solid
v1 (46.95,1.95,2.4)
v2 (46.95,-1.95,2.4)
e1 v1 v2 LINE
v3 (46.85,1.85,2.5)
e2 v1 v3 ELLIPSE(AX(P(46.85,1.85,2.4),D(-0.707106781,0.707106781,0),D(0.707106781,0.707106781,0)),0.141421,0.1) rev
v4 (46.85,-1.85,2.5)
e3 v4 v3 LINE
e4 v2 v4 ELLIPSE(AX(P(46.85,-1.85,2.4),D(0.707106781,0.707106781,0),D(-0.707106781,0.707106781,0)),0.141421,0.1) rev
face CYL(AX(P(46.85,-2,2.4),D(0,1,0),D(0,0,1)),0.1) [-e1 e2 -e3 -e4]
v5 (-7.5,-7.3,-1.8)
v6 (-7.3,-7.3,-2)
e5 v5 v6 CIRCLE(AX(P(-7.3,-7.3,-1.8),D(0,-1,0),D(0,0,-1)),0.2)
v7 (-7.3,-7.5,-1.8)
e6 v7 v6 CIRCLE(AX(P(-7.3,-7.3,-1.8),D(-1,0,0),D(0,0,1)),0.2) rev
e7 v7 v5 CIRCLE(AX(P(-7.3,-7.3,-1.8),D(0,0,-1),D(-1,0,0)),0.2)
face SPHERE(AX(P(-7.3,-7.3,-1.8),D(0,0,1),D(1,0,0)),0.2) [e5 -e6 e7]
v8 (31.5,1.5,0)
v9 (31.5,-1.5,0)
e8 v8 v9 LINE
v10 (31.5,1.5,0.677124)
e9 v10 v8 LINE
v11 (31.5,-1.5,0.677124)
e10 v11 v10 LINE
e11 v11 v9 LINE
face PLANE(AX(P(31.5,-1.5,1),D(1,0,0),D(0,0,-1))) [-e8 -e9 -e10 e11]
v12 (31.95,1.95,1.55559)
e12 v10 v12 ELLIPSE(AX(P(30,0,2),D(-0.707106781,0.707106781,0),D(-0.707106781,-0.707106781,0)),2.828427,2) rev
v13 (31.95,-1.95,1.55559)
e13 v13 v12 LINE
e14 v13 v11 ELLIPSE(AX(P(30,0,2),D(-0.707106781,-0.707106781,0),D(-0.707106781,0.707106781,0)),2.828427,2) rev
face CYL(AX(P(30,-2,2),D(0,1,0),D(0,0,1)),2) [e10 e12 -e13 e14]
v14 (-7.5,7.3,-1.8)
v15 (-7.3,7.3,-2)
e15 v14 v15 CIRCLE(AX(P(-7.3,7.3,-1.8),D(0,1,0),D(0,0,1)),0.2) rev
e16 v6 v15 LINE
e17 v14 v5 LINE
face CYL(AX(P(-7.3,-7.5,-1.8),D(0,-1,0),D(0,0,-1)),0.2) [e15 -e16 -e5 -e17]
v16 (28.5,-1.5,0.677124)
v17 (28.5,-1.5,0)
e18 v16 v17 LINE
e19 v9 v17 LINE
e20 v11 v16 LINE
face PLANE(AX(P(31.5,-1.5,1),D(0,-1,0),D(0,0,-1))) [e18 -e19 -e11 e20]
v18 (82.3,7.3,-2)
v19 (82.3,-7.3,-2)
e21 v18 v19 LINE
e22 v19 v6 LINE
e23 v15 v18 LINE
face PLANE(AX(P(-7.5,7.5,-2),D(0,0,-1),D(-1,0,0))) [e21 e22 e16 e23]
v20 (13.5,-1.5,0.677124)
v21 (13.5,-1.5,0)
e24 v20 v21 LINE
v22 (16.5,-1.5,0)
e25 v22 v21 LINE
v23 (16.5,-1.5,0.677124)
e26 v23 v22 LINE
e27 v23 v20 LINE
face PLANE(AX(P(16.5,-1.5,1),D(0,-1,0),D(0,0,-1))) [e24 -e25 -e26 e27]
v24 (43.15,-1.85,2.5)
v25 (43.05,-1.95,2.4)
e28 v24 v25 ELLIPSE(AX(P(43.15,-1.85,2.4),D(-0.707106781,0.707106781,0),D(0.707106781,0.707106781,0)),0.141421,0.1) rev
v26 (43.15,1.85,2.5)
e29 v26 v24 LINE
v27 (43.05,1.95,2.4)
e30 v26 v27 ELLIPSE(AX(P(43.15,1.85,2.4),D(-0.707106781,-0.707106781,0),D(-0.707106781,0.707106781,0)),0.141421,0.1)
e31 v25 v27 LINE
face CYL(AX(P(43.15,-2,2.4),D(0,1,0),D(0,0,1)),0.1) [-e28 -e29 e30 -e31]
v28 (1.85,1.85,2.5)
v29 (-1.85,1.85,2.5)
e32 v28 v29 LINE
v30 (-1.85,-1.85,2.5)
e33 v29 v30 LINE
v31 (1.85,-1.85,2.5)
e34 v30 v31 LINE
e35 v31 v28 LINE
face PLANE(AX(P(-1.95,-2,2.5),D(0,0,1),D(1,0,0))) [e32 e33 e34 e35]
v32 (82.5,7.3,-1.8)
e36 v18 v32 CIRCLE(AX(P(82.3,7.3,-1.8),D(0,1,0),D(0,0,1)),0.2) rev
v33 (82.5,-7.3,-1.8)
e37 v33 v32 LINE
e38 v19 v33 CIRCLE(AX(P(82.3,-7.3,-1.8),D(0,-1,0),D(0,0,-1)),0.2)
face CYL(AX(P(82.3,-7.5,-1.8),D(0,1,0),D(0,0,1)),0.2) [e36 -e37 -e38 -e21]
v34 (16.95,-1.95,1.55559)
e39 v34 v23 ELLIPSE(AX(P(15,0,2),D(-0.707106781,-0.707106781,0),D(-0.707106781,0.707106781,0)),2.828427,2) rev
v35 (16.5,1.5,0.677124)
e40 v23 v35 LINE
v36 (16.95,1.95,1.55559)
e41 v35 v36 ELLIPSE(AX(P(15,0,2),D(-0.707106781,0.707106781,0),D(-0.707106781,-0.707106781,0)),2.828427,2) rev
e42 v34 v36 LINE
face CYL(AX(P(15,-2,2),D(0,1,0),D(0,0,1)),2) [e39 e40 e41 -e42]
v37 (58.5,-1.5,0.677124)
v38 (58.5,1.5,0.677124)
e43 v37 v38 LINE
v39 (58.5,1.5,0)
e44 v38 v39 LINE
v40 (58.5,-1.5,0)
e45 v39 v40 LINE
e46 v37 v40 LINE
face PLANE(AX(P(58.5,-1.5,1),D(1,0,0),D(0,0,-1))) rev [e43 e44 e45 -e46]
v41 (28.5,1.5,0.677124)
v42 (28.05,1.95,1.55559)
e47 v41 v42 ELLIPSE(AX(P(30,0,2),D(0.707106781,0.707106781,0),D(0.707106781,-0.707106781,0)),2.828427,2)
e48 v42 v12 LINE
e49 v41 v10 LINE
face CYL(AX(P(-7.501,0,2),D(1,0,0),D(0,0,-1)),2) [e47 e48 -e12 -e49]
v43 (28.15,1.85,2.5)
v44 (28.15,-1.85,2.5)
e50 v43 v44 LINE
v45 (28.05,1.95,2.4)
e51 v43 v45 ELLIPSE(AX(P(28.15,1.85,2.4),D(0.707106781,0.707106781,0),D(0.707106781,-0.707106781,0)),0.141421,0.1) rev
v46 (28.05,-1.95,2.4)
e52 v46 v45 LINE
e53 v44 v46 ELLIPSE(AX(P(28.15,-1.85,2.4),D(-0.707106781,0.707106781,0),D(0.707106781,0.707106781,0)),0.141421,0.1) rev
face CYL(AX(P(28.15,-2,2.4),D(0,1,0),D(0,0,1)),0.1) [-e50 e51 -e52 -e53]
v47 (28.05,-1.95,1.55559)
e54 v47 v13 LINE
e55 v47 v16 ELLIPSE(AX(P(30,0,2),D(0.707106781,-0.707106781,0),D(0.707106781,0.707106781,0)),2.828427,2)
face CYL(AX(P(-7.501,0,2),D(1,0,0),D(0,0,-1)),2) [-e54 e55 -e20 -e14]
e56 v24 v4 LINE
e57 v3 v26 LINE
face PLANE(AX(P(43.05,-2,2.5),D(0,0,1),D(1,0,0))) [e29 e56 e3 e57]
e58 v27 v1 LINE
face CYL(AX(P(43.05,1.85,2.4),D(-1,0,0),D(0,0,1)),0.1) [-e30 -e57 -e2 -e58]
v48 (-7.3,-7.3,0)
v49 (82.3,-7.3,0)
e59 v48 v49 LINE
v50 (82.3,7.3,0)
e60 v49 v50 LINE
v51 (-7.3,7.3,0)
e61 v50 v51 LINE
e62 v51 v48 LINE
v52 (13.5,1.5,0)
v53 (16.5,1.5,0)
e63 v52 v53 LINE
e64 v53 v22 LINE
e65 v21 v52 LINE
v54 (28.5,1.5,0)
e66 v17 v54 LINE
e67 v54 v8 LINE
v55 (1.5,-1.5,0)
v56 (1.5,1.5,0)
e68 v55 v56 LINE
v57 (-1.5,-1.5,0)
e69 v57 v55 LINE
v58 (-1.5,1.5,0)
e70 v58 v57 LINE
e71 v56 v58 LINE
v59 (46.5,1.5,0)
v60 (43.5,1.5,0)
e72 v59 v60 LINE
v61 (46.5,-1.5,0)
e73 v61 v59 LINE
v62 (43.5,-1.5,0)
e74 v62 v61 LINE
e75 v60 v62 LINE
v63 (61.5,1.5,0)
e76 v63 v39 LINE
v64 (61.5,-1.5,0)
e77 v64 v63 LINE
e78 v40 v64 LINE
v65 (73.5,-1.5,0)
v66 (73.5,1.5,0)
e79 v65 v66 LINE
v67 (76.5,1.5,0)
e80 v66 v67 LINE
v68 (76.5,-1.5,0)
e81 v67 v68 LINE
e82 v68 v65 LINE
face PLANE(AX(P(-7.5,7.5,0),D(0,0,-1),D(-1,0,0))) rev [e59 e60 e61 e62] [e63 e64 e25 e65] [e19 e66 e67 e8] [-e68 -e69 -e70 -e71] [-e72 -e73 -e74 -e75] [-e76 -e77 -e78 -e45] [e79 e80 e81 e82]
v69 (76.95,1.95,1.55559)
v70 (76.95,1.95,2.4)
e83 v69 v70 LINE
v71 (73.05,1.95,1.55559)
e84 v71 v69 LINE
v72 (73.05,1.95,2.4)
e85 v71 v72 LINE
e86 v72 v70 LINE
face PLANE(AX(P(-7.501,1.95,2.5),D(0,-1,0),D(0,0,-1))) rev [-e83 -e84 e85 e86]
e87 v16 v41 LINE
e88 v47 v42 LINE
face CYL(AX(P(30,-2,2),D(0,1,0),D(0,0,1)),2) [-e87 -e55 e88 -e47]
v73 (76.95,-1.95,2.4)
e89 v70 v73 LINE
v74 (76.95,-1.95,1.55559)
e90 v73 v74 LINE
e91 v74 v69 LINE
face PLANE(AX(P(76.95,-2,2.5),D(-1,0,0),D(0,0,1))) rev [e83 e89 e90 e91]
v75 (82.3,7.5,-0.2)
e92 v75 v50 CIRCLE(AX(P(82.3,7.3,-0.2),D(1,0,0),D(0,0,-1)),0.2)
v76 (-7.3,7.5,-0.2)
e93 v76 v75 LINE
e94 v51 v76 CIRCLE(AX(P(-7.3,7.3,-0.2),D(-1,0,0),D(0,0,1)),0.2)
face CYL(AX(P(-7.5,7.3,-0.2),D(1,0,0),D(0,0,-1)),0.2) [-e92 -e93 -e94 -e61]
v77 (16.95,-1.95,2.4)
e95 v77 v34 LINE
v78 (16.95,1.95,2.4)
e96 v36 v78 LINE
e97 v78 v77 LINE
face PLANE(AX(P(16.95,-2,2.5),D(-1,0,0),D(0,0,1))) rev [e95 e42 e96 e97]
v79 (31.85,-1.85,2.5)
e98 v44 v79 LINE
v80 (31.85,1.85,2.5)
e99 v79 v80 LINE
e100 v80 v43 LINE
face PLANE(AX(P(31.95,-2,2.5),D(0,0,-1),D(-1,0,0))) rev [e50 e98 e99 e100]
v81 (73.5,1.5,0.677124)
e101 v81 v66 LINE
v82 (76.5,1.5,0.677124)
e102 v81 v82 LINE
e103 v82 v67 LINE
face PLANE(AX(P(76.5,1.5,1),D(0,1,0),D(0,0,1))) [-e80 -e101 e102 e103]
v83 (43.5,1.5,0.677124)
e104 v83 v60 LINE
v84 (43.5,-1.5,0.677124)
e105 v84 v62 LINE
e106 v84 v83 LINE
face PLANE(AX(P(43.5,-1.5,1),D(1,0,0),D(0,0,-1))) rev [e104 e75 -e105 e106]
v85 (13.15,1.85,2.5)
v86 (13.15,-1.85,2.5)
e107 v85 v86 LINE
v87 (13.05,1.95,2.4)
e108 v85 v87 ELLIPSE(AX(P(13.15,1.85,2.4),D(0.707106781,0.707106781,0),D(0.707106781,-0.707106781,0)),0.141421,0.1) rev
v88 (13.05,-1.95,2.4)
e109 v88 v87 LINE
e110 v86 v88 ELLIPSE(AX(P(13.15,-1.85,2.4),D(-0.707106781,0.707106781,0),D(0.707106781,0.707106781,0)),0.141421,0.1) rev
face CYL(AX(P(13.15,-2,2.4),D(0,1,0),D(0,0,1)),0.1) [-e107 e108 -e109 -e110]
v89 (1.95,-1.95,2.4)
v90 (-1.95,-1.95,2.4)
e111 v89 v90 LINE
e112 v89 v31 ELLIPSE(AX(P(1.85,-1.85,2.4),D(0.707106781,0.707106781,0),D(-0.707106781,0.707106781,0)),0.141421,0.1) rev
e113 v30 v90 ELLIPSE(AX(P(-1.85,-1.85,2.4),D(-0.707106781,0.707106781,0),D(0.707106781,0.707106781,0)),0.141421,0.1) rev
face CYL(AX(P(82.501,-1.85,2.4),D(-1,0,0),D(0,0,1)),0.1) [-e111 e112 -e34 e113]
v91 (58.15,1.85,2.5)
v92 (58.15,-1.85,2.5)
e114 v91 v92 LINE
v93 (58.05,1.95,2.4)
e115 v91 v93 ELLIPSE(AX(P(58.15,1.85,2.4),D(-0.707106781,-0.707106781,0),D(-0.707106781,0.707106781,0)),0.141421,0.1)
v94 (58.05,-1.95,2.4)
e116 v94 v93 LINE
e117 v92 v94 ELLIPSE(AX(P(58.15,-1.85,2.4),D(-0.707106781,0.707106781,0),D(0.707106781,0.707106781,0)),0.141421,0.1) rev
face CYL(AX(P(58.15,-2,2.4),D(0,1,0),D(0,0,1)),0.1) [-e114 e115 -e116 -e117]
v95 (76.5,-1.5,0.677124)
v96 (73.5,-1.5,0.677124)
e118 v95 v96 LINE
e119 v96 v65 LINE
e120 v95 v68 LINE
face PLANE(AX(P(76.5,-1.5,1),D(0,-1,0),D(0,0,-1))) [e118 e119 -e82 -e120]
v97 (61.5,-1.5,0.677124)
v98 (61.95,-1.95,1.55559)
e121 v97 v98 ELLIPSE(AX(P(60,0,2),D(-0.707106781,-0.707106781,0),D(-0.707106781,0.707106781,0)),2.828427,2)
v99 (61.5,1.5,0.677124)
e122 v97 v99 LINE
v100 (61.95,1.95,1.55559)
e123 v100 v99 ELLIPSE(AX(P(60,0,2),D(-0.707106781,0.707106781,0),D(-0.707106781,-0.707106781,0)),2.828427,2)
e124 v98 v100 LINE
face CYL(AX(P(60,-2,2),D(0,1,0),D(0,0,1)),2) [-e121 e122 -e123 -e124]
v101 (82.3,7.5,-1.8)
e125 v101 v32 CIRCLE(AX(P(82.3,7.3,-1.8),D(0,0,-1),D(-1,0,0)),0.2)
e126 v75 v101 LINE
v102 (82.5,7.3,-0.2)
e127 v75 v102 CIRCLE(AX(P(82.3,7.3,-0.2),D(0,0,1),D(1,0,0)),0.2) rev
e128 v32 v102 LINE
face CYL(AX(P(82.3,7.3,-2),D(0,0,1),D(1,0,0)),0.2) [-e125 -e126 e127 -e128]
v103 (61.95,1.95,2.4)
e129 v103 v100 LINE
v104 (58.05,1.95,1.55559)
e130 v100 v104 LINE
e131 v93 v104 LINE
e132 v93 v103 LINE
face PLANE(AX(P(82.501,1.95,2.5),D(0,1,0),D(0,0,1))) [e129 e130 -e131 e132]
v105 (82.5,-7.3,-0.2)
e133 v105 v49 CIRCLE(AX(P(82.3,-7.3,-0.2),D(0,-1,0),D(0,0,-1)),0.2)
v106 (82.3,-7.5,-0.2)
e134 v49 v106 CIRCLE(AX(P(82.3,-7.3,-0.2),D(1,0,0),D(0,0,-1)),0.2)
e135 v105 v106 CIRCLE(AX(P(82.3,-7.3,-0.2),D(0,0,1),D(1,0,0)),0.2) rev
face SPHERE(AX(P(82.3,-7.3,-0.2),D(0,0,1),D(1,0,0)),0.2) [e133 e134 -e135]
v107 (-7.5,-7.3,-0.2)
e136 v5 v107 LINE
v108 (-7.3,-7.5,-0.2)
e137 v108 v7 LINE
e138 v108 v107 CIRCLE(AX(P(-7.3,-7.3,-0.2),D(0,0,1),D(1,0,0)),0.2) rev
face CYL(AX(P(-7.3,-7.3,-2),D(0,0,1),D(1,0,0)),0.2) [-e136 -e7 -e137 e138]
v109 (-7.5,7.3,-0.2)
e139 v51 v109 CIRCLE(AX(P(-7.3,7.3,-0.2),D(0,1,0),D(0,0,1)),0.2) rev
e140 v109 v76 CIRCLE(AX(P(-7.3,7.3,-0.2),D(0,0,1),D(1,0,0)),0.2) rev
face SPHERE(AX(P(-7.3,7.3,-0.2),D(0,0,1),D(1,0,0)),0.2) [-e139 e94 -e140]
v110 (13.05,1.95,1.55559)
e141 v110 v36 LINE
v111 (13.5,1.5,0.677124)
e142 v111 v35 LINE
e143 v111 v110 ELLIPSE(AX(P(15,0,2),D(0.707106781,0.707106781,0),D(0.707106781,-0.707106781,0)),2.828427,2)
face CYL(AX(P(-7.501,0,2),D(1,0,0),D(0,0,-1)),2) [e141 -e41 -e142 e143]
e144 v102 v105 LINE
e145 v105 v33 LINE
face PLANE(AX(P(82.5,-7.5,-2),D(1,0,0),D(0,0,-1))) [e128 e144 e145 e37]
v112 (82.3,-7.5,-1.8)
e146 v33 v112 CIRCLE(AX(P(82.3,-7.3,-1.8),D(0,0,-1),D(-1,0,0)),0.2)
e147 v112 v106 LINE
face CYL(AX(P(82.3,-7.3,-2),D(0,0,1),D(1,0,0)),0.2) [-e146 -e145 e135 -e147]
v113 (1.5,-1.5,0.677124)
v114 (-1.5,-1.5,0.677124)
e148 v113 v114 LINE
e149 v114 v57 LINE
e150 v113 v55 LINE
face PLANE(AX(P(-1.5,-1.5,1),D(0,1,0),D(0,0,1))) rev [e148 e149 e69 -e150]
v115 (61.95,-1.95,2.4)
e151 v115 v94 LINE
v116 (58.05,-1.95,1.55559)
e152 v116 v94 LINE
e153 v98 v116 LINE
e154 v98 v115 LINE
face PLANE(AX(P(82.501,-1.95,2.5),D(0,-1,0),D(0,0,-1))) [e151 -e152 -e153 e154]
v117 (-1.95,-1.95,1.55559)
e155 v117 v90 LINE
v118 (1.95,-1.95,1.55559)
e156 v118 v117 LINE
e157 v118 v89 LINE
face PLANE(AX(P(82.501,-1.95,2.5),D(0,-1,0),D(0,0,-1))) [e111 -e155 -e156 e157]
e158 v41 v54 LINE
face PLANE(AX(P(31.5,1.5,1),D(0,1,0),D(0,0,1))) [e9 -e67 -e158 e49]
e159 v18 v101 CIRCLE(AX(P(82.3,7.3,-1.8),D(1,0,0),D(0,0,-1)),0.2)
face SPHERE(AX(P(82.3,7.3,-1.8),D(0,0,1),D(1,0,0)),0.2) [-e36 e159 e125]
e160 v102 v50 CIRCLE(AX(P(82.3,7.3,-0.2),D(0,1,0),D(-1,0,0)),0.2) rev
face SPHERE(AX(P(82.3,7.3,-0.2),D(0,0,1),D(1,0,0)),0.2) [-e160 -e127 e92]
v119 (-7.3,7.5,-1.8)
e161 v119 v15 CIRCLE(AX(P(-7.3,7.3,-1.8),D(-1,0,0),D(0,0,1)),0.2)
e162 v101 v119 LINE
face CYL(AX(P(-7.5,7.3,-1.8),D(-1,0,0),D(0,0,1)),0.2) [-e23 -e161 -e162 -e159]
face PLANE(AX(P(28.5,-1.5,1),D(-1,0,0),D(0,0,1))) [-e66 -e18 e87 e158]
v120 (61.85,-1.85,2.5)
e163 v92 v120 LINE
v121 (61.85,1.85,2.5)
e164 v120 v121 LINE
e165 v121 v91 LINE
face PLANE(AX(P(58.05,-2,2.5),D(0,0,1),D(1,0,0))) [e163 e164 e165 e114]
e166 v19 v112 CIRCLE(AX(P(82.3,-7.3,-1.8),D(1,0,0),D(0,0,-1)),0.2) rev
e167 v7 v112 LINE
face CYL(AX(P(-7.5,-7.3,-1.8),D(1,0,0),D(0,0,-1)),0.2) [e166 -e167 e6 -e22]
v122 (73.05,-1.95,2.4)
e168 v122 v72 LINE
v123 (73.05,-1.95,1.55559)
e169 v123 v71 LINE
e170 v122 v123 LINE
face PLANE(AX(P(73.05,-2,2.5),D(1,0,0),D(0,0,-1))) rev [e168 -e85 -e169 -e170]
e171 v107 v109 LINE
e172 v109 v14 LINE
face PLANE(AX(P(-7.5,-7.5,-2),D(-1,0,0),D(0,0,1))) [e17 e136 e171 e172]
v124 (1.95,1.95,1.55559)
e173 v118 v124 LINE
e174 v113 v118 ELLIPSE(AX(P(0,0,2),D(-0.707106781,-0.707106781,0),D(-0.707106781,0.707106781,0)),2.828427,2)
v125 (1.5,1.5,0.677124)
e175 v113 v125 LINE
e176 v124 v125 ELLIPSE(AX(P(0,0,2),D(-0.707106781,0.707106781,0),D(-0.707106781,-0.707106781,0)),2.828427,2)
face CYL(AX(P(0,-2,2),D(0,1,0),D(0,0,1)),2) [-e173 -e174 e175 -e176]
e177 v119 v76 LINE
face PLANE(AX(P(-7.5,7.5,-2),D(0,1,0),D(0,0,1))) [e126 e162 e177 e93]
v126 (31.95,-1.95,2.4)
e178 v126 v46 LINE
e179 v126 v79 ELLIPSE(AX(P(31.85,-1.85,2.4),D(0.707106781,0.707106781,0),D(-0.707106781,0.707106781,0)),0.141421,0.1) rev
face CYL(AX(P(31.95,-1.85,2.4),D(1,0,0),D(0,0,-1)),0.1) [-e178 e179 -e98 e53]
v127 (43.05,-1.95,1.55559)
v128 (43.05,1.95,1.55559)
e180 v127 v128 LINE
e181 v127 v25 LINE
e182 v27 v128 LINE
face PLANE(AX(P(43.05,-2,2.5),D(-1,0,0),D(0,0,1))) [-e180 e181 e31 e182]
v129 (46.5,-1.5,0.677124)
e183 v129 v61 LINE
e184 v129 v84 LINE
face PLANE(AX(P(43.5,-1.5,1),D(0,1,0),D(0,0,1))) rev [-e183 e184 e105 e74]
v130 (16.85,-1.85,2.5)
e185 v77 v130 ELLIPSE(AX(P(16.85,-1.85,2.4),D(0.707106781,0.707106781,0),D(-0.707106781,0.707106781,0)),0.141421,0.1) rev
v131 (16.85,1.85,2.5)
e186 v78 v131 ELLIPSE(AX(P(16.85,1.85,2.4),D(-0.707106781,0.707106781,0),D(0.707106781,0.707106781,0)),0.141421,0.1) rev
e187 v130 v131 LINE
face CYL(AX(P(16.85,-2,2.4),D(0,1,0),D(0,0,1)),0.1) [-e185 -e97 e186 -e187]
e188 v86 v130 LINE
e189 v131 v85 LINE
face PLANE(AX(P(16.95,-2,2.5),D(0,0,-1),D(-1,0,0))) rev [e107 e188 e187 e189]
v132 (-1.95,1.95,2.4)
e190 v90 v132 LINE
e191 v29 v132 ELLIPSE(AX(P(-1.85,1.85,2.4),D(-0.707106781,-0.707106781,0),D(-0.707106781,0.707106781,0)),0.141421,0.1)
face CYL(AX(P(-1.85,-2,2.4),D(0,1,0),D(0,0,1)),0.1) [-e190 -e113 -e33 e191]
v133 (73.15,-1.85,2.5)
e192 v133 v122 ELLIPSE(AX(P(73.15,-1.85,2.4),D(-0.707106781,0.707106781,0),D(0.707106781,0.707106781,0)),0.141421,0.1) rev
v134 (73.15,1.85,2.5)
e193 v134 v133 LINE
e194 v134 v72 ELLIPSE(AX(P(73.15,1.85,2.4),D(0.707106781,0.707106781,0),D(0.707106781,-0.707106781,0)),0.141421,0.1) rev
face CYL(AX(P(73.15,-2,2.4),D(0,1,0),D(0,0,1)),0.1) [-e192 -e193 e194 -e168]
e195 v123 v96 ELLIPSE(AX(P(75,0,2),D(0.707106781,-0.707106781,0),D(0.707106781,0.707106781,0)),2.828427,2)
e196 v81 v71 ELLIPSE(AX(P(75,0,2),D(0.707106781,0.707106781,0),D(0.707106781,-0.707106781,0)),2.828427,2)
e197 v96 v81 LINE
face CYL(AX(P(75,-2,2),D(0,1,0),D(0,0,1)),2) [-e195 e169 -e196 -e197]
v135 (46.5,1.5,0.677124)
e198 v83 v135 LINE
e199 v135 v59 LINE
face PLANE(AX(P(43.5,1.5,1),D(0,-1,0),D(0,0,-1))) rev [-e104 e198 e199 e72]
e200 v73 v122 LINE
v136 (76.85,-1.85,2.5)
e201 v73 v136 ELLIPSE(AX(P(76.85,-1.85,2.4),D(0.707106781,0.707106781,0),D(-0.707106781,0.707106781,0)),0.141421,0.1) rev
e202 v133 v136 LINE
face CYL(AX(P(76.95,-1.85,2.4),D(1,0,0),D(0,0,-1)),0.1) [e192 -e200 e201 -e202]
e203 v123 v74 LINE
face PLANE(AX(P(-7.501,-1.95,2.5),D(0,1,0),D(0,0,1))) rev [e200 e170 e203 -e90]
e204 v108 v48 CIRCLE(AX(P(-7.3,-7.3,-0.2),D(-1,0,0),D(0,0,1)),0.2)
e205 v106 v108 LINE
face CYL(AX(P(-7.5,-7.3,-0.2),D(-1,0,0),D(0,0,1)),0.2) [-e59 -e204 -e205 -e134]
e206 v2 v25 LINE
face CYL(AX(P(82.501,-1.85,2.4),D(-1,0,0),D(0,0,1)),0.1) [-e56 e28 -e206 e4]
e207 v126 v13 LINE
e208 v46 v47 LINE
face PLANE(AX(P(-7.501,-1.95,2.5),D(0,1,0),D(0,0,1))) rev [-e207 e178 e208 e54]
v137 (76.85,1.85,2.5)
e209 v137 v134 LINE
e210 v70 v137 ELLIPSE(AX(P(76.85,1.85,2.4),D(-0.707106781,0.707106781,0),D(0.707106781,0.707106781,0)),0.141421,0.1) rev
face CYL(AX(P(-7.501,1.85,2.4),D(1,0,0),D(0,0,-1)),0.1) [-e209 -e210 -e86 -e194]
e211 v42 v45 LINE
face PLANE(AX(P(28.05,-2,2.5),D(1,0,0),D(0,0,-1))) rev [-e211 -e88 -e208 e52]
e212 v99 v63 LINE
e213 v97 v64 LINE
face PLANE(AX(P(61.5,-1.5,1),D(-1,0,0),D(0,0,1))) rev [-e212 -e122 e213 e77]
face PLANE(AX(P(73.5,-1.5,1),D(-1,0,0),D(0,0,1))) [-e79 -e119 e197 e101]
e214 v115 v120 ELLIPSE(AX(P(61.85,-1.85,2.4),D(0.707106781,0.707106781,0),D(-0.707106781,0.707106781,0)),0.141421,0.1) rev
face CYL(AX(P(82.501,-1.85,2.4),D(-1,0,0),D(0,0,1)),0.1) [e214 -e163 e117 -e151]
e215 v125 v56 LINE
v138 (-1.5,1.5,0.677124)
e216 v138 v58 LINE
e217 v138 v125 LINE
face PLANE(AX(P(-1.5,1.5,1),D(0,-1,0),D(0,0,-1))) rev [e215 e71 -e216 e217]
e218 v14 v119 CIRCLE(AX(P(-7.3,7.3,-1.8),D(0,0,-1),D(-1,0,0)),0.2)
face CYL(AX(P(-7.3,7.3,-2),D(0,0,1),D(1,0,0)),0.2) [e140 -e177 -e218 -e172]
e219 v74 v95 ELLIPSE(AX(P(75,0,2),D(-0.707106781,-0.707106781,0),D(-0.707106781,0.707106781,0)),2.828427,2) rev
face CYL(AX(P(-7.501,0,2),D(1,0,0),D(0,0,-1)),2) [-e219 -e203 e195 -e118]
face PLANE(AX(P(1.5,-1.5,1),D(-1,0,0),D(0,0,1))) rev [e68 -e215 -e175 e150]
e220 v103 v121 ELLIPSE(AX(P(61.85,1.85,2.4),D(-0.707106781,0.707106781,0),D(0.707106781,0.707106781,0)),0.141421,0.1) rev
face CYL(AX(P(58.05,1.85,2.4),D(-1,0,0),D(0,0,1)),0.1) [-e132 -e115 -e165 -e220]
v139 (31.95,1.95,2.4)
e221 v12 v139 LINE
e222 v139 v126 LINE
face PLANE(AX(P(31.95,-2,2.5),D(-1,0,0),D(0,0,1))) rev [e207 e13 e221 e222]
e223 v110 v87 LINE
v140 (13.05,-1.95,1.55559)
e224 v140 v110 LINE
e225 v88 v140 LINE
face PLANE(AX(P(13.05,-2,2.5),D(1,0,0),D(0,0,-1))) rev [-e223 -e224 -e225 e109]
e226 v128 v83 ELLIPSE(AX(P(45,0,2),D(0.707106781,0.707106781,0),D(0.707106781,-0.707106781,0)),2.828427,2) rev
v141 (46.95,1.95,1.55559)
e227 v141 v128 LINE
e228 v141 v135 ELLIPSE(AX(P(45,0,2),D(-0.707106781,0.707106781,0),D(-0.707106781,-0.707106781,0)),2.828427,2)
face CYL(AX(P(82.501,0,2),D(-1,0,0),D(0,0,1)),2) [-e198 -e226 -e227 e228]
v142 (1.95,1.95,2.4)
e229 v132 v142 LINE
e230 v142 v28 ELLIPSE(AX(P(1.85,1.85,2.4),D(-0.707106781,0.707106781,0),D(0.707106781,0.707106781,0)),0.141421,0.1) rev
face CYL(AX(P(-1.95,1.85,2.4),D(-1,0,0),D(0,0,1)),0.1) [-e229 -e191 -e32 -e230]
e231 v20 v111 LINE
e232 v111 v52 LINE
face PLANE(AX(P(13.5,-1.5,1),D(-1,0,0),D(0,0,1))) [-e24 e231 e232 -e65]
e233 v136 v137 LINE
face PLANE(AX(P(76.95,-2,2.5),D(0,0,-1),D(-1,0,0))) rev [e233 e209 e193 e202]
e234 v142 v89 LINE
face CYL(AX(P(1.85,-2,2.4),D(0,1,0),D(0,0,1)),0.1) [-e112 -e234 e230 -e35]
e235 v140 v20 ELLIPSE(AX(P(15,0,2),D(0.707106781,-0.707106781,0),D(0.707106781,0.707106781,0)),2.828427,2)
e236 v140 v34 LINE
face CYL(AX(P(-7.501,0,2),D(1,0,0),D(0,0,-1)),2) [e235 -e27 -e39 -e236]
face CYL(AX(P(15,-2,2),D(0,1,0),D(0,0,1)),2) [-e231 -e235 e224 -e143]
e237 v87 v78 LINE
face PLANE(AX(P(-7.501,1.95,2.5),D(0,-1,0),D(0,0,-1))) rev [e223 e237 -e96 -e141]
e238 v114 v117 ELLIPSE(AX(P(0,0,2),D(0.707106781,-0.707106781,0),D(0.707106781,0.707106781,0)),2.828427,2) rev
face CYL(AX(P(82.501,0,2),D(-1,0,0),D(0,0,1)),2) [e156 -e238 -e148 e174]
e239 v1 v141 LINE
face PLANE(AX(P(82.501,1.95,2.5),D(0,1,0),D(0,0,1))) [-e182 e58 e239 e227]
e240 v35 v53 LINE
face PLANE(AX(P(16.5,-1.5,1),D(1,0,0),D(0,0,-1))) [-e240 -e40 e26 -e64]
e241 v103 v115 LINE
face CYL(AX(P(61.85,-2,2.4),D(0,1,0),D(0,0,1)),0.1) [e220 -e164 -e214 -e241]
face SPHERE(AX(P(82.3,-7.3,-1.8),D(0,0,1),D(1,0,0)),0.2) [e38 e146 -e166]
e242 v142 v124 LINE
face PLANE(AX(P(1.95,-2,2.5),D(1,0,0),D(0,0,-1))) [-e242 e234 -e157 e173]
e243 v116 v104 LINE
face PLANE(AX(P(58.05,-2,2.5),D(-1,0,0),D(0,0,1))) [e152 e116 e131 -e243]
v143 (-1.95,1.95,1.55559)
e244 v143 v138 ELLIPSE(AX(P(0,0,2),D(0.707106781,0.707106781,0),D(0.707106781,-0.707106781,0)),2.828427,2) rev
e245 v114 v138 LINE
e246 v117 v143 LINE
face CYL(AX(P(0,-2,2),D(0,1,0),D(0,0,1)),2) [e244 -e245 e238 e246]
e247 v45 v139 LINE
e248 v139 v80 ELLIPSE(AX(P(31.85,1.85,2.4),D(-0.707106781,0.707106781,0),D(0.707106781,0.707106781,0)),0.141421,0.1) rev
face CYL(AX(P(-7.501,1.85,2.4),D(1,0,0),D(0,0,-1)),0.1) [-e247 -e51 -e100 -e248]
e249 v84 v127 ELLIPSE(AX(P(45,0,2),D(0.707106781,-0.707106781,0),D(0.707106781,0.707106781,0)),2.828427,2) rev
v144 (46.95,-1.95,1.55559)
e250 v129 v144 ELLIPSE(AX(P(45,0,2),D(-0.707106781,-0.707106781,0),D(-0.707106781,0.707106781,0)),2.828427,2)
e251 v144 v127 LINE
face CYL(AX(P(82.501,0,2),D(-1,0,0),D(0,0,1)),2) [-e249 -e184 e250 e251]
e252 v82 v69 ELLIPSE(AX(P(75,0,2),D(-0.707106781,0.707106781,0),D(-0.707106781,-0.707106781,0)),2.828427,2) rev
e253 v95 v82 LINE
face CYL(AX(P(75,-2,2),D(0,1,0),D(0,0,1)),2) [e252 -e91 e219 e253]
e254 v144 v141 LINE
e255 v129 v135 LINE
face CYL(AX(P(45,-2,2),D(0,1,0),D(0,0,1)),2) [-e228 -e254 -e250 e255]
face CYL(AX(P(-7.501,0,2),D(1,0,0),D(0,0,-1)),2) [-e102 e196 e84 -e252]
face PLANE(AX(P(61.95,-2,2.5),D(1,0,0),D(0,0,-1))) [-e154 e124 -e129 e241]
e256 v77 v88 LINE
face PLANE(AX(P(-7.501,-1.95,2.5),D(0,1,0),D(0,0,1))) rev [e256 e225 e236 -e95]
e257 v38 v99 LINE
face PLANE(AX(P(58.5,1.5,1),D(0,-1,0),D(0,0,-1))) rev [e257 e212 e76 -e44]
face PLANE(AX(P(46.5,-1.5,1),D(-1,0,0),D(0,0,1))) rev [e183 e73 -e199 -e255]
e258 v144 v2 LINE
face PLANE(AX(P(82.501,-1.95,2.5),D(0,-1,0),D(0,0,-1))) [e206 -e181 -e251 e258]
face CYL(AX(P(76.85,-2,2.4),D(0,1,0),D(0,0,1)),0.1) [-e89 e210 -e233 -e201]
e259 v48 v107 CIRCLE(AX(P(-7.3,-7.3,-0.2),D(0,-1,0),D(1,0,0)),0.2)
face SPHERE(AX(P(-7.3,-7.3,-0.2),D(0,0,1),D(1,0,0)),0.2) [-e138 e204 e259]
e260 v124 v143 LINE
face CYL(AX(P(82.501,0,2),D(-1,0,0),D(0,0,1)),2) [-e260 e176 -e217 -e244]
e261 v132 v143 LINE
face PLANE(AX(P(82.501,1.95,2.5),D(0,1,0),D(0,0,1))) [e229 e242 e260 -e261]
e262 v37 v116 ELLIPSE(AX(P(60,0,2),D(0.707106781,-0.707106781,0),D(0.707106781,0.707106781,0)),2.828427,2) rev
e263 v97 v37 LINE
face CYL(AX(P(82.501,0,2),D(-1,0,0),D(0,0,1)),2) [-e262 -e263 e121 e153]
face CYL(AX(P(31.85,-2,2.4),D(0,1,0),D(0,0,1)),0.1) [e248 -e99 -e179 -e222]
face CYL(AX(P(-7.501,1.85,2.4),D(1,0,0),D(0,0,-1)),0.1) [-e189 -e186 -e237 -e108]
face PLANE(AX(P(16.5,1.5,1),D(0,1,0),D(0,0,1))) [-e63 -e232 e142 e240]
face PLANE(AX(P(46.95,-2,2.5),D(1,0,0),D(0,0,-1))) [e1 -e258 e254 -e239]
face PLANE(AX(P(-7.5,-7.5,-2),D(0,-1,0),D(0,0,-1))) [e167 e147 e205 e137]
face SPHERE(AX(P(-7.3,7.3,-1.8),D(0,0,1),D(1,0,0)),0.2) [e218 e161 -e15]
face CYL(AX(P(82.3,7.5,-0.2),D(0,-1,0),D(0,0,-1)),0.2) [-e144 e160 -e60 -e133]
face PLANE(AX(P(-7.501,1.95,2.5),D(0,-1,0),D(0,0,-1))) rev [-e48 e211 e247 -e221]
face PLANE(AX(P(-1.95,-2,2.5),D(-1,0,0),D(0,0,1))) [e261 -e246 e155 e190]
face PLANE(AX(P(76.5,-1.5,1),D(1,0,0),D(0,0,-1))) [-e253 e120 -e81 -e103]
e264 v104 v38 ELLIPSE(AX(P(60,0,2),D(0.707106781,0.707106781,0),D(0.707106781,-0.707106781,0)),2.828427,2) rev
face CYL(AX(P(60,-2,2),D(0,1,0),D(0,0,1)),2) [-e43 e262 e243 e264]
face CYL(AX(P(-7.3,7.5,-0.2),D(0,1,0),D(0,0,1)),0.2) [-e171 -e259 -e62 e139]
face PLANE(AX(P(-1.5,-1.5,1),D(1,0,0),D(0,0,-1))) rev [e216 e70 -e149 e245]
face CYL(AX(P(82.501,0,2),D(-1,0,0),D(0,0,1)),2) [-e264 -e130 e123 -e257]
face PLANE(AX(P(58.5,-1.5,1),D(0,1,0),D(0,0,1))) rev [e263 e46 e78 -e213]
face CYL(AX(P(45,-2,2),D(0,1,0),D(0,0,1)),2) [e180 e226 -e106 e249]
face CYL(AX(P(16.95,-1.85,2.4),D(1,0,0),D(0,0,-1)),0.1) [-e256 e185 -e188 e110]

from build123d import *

# Parameters (mm, degrees)
SKETCH_1_W                      = 90
SKETCH_1_H                      = 15
EXTRUDE_1_DEPTH                 = 2
SKETCH_2_W                      = 3
SKETCH_2_H                      = 3
EXTRUDE_2_DEPTH                 = 1
EXTRUDE_3_DEPTH                 = 2
CUT_EXTRUDE_1_REACH             = 84.878
CUT_EXTRUDE_1_DIRECTION_2_REACH = 84.878
FILLET_1_R                      = 0.1
FILLET_1_OF_MIRROR_1_R          = 0.1
FILLET_1_OF_MIRROR_3_R          = 0.1
FILLET_2_R                      = 0.2


# Read off the part's stored shape, not the designer's step: 镜向4
with BuildPart() as part:
    # 草图1 → 凸台-拉伸1 (new body)
    with BuildSketch(Plane.XY):
        with Locations((37.5, 0)):
            Rectangle(SKETCH_1_W, SKETCH_1_H)
    extrude(amount=-EXTRUDE_1_DEPTH)

    # 草图2 → 凸台-拉伸2 (add)
    with BuildSketch(Plane.XY):
        Rectangle(SKETCH_2_W, SKETCH_2_H)
    extrude_2 = extrude(amount=EXTRUDE_2_DEPTH)

    # 草图3 → 凸台-拉伸3 (add, symmetric)
    with BuildSketch(Plane(origin=(0, 0, 0), x_dir=(1, 0, 0), z_dir=(0, 1, 0))):
        with BuildLine():
            Line((-1.95, -2.5), (1.95, -2.5))
            Line((1.95, -2.5), (1.95, -1.555590279))
            ThreePointArc((1.95, -1.555590279), (1.780042303, -1.088161527), (1.5, -0.677124344))
            Line((1.5, -0.677124344), (-1.5, -0.677124344))
            ThreePointArc((-1.5, -0.677124344), (-1.780042303, -1.088161527), (-1.95, -1.555590279))
            Line((-1.95, -1.555590279), (-1.95, -2.5))
        make_face()
    extrude_3 = extrude(amount=EXTRUDE_3_DEPTH, both=True)

    # 草图4 → 切除-拉伸1 (cut, up to next)
    with BuildSketch(Plane(origin=(0, 0, 0), x_dir=(0, 0, -1), z_dir=(1, 0, 0)), mode=Mode.PRIVATE) as cut_extrude_1_sk1:
        with BuildLine():
            Line((-2.5, 1.95), (-1.555590279, 1.95))
            ThreePointArc((-1.555590279, 1.95), (-1.088161527, 1.780042303), (-0.677124344, 1.5))
            Line((-0.677124344, 1.5), (-0.677124344, 2))
            Line((-0.677124344, 2), (-2.5, 2))
            Line((-2.5, 2), (-2.5, 1.95))
        make_face()
    cut_extrude_1_tool1 = extrude(cut_extrude_1_sk1.sketch, amount=-CUT_EXTRUDE_1_REACH, mode=Mode.PRIVATE) & part.part
    # 草图4 → 切除-拉伸1 (cut, up to next)
    with BuildSketch(Plane(origin=(0, 0, 0), x_dir=(0, 0, -1), z_dir=(1, 0, 0)), mode=Mode.PRIVATE) as cut_extrude_1_sk2:
        with BuildLine():
            Line((-2.5, -2), (-0.677124344, -2))
            Line((-0.677124344, -2), (-0.677124344, -1.5))
            ThreePointArc((-0.677124344, -1.5), (-1.088161527, -1.780042303), (-1.555590279, -1.95))
            Line((-1.555590279, -1.95), (-2.5, -1.95))
            Line((-2.5, -1.95), (-2.5, -2))
        make_face()
    cut_extrude_1_tool2 = extrude(cut_extrude_1_sk2.sketch, amount=-CUT_EXTRUDE_1_REACH, mode=Mode.PRIVATE) & part.part
    cut_extrude_1_1 = cut_extrude_1_tool1.solids().sort_by_distance((0, 1.873038, 1.175075))[0]
    add(cut_extrude_1_1, mode=Mode.SUBTRACT)
    cut_extrude_1_2 = cut_extrude_1_tool2.solids().sort_by_distance((0, -1.873038, 1.175075))[0]
    add(cut_extrude_1_2, mode=Mode.SUBTRACT)
    cut_extrude_1 = cut_extrude_1_1 + cut_extrude_1_2  # 切除-拉伸1 as one shape, for the pattern or mirror that repeats it

    # 草图4 → 切除-拉伸1 direction 2 (cut, up to next)
    with BuildSketch(Plane(origin=(0, 0, 0), x_dir=(0, 0, -1), z_dir=(1, 0, 0)), mode=Mode.PRIVATE) as cut_extrude_1_direction_2_sk1:
        with BuildLine():
            Line((-2.5, 1.95), (-1.555590279, 1.95))
            ThreePointArc((-1.555590279, 1.95), (-1.088161527, 1.780042303), (-0.677124344, 1.5))
            Line((-0.677124344, 1.5), (-0.677124344, 2))
            Line((-0.677124344, 2), (-2.5, 2))
            Line((-2.5, 2), (-2.5, 1.95))
        make_face()
    cut_extrude_1_direction_2_tool1 = extrude(cut_extrude_1_direction_2_sk1.sketch, amount=CUT_EXTRUDE_1_DIRECTION_2_REACH, mode=Mode.PRIVATE) & part.part
    # 草图4 → 切除-拉伸1 direction 2 (cut, up to next)
    with BuildSketch(Plane(origin=(0, 0, 0), x_dir=(0, 0, -1), z_dir=(1, 0, 0)), mode=Mode.PRIVATE) as cut_extrude_1_direction_2_sk2:
        with BuildLine():
            Line((-2.5, -2), (-0.677124344, -2))
            Line((-0.677124344, -2), (-0.677124344, -1.5))
            ThreePointArc((-0.677124344, -1.5), (-1.088161527, -1.780042303), (-1.555590279, -1.95))
            Line((-1.555590279, -1.95), (-2.5, -1.95))
            Line((-2.5, -1.95), (-2.5, -2))
        make_face()
    cut_extrude_1_direction_2_tool2 = extrude(cut_extrude_1_direction_2_sk2.sketch, amount=CUT_EXTRUDE_1_DIRECTION_2_REACH, mode=Mode.PRIVATE) & part.part
    cut_extrude_1_direction_2_1 = cut_extrude_1_direction_2_tool1.solids().sort_by_distance((0, 1.873038, 1.175075))[0]
    add(cut_extrude_1_direction_2_1, mode=Mode.SUBTRACT)
    cut_extrude_1_direction_2_2 = cut_extrude_1_direction_2_tool2.solids().sort_by_distance((0, -1.873038, 1.175075))[0]
    add(cut_extrude_1_direction_2_2, mode=Mode.SUBTRACT)
    cut_extrude_1_direction_2 = cut_extrude_1_direction_2_1 + cut_extrude_1_direction_2_2  # 切除-拉伸1 direction 2 as one shape, for the pattern or mirror that repeats it

    # 圆角1
    fillet_1_edges = [part.edges().sort_by_distance(p)[0] for p in [
        (-1.95, 0, 2.5),
        (1.95, 0, 2.5),
        (0, -1.95, 2.5),
        (0, 1.95, 2.5),
    ]]
    fillet(fillet_1_edges, radius=FILLET_1_R)

    # 镜向1: 凸台-拉伸2, 凸台-拉伸3, 切除-拉伸1, 切除-拉伸1 direction 2 across plane
    add(extrude_2.mirror(Plane(origin=(7.5, 0, 0), x_dir=(0, 0, 1), z_dir=(1, 0, 0))))
    add(extrude_3.mirror(Plane(origin=(7.5, 0, 0), x_dir=(0, 0, 1), z_dir=(1, 0, 0))))
    add(cut_extrude_1.mirror(Plane(origin=(7.5, 0, 0), x_dir=(0, 0, 1), z_dir=(1, 0, 0))), mode=Mode.SUBTRACT)
    add(cut_extrude_1_direction_2.mirror(Plane(origin=(7.5, 0, 0), x_dir=(0, 0, 1), z_dir=(1, 0, 0))), mode=Mode.SUBTRACT)

    # 圆角1 of 镜向1
    fillet_1_of_mirror_1_edges = [part.edges().sort_by_distance(p)[0] for p in [
        (16.95, 0, 2.5),
        (13.05, 0, 2.5),
        (15, -1.95, 2.5),
        (15, 1.95, 2.5),
    ]]
    fillet(fillet_1_of_mirror_1_edges, radius=FILLET_1_OF_MIRROR_1_R)

    # 镜向3: 凸台-拉伸2, 凸台-拉伸3, 切除-拉伸1, 切除-拉伸1 direction 2 across plane
    add(extrude_2.mirror(Plane(origin=(15, 0, 0), x_dir=(0, 0, 1), z_dir=(1, 0, 0))))
    add(extrude_3.mirror(Plane(origin=(15, 0, 0), x_dir=(0, 0, 1), z_dir=(1, 0, 0))))
    add(cut_extrude_1.mirror(Plane(origin=(15, 0, 0), x_dir=(0, 0, 1), z_dir=(1, 0, 0))), mode=Mode.SUBTRACT)
    add(cut_extrude_1_direction_2.mirror(Plane(origin=(15, 0, 0), x_dir=(0, 0, 1), z_dir=(1, 0, 0))), mode=Mode.SUBTRACT)

    # 圆角1 of 镜向3
    fillet_1_of_mirror_3_edges = [part.edges().sort_by_distance(p)[0] for p in [
        (31.95, 0, 2.5),
        (28.05, 0, 2.5),
        (30, -1.95, 2.5),
        (30, 1.95, 2.5),
    ]]
    fillet(fillet_1_of_mirror_3_edges, radius=FILLET_1_OF_MIRROR_3_R)

    # 镜向4: part across plane


with BuildPart() as part_1:
    add(part.part)
    add(part.part.mirror(Plane(origin=(37.5, 0, 0), x_dir=(0, 0, 1), z_dir=(1, 0, 0))))

    # 圆角2
    fillet_2_edges = [part_1.edges().sort_by_distance(p)[0] for p in [
        (82.5, 0, -2),
        (37.5, 7.5, -2),
        (-7.5, 0, -2),
        (37.5, 7.5, 0),
        (82.5, 0, 0),
        (37.5, -7.5, 0),
        (-7.5, 0, 0),
        (37.5, -7.5, -2),
        (-7.5, 7.5, -1),
        (82.5, 7.5, -1),
        (82.5, -7.5, -1),
        (-7.5, -7.5, -1),
    ]]
    fillet(fillet_2_edges, radius=FILLET_2_R)


solid = part_1.part
